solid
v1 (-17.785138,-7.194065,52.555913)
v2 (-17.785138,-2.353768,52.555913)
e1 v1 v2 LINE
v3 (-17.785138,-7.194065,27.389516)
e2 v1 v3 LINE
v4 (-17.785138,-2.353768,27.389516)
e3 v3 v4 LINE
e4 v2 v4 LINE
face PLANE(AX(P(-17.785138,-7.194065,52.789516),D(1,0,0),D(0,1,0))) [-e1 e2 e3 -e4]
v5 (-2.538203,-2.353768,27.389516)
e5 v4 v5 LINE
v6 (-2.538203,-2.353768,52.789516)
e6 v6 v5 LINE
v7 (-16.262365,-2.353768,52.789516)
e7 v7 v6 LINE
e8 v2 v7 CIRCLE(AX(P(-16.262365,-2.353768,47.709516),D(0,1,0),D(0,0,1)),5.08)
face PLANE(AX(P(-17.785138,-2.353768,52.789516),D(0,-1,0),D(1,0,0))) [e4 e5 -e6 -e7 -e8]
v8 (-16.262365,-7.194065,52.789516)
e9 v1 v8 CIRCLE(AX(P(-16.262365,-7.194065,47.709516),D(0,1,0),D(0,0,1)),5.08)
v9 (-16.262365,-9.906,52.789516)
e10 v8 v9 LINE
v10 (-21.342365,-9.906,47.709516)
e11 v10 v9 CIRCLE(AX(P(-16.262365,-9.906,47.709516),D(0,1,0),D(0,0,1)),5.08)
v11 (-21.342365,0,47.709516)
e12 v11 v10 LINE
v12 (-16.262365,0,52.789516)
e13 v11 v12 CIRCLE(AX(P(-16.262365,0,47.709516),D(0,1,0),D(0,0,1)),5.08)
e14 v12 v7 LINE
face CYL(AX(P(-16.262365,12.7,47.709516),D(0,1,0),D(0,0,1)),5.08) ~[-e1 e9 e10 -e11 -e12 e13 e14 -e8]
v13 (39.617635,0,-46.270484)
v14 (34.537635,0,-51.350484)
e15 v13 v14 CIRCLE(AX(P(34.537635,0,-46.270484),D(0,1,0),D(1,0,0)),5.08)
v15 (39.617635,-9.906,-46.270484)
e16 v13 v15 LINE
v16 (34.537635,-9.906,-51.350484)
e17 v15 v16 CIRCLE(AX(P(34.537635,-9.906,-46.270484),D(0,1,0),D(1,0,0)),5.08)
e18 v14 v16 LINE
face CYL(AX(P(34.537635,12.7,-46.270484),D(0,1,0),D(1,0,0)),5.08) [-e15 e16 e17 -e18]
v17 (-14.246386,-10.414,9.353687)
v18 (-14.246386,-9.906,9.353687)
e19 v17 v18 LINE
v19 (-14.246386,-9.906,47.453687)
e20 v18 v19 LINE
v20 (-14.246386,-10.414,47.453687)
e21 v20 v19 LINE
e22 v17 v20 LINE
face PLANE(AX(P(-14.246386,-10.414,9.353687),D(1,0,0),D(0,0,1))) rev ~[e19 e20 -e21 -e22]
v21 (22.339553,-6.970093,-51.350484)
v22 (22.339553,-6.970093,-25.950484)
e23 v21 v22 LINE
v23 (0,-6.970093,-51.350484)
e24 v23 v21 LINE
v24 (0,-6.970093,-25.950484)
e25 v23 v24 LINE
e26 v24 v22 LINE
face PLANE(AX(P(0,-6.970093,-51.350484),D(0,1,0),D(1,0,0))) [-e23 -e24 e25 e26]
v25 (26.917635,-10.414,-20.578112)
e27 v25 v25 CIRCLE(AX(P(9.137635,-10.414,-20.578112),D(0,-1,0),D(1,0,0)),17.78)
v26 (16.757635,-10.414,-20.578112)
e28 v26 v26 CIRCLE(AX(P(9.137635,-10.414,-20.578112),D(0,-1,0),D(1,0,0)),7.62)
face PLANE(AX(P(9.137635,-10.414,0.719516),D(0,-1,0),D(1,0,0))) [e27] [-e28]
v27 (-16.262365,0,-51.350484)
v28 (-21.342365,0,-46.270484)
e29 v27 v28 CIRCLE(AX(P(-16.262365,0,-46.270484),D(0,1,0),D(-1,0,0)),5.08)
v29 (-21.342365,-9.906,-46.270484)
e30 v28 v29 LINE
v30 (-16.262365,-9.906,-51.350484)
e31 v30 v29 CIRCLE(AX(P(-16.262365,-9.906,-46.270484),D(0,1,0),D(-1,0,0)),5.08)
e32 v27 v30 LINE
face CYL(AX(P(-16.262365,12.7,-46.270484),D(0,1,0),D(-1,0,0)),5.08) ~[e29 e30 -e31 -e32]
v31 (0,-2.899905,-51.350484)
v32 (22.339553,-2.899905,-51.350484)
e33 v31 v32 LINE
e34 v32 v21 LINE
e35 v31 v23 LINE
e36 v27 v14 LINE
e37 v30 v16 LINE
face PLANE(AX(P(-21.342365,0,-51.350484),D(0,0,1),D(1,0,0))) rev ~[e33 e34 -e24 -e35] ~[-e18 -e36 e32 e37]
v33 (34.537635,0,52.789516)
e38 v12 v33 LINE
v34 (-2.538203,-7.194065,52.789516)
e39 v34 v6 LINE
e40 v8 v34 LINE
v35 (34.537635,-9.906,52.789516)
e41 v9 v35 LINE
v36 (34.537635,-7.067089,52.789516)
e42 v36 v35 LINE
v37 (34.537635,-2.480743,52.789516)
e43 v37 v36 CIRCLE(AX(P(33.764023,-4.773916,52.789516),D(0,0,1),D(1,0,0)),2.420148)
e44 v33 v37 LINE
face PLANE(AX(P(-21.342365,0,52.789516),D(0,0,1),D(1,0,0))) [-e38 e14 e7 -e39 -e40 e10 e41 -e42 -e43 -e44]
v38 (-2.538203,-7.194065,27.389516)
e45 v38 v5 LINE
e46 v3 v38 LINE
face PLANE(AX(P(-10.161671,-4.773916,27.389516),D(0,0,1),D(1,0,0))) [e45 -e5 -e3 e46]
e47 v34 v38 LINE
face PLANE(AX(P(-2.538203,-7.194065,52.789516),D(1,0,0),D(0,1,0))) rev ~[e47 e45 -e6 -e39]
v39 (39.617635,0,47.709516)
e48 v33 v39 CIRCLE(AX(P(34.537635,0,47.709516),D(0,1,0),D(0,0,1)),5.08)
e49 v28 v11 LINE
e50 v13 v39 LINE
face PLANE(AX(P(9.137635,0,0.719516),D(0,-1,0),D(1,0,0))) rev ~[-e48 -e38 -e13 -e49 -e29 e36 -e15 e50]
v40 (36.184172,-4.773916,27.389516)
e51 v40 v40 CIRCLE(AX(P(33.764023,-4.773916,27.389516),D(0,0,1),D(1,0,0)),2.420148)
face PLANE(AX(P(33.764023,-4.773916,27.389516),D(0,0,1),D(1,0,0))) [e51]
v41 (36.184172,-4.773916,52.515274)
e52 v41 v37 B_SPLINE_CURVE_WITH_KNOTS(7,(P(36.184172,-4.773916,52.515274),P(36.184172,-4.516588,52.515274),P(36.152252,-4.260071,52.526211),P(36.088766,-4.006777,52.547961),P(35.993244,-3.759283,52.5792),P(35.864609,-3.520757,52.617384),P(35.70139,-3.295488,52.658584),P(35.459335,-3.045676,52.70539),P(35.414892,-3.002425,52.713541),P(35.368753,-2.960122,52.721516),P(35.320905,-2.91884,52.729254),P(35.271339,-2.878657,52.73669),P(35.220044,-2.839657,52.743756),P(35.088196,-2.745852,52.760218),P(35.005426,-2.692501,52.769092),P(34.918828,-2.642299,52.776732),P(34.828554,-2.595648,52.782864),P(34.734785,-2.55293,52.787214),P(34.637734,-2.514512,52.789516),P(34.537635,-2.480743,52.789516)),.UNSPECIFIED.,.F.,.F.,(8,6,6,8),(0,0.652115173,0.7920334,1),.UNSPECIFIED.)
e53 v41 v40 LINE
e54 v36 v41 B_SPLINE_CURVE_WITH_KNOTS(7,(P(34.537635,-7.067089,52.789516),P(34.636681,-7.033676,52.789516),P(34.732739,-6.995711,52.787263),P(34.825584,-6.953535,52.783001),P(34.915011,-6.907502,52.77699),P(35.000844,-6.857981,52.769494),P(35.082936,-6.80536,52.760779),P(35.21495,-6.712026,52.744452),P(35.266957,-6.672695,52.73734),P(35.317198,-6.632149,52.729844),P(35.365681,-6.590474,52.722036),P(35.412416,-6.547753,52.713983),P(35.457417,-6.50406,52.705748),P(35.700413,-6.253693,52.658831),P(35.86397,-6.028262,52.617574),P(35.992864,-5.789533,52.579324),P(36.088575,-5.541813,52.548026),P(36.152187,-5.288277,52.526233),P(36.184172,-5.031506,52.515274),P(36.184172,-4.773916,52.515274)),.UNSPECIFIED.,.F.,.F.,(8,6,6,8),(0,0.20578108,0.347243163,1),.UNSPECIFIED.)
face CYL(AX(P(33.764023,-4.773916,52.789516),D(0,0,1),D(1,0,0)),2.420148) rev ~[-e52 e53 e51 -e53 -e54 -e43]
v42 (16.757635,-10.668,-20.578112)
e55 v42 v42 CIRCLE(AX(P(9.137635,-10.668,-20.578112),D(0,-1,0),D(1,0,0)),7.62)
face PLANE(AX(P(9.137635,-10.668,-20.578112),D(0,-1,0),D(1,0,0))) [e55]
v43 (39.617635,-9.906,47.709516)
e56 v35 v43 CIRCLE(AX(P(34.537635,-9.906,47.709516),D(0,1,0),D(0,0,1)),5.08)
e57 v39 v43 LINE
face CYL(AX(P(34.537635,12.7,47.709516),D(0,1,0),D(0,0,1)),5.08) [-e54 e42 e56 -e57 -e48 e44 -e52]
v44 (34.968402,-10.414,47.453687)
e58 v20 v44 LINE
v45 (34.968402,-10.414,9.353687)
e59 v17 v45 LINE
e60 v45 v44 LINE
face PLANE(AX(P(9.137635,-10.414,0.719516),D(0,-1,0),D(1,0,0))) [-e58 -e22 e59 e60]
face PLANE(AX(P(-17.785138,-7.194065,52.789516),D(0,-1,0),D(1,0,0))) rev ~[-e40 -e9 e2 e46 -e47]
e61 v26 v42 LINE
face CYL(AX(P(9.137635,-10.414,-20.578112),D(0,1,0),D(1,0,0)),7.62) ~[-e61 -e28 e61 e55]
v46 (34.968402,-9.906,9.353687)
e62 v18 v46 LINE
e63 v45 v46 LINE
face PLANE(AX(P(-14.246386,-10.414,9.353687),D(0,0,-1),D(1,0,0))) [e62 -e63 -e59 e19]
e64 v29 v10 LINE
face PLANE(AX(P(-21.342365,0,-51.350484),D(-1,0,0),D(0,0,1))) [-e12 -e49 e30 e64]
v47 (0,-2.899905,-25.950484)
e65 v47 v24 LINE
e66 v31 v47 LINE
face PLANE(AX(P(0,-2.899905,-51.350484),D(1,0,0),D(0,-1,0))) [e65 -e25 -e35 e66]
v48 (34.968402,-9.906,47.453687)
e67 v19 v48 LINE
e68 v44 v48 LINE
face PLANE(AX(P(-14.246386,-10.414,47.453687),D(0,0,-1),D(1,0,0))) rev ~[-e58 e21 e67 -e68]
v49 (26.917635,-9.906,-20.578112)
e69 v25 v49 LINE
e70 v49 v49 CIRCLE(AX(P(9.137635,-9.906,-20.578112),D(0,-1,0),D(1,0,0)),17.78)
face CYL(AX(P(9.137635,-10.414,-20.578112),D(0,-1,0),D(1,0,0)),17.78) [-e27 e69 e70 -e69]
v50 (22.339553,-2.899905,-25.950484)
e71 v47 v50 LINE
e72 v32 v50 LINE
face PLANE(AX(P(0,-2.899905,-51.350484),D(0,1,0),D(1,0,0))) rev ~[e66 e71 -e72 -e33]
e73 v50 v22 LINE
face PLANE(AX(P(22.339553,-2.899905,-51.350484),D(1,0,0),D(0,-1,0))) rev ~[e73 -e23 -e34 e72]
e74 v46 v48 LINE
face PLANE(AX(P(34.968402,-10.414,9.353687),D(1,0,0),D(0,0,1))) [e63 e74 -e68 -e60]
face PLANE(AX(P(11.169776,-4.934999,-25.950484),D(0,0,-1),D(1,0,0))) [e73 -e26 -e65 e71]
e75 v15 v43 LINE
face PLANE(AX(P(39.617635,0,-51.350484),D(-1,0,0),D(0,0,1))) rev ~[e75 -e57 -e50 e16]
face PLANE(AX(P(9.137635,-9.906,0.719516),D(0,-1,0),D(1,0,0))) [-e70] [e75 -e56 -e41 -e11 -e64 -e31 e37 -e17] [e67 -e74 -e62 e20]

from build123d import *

# Parameters (mm, degrees)
F0_W        = 60.96
F0_H        = 104.14
F1_DEPTH    = 10.414
F2_W        = 60.96
F2_H        = 104.14
F2_R        = 17.78
F2_W_2      = 49.2147877812
F2_H_2      = 38.1
F3_DEPTH    = 0.508
F4_R        = 7.62
F5_DEPTH    = 0.254
F6_W        = 15.2469340246
F6_H        = 4.8402966931
F6_R        = 2.4201483466
F7_DEPTH    = 25.4
F8_T1_DEPTH = 35.306
F9_W        = 22.3395526409
F9_H        = 4.0701881517
F10_DEPTH   = 25.4


# Not quite as in the source:
# - a fillet or chamfer that OpenCascade refuses, or shapes differently, is made with other operations: its cross-section is extruded or revolved along the edge and cut away or added


with BuildPart() as f1:
    # F0 (on Front) → F1 (new body)
    with BuildSketch(Plane.XZ):
        with Locations((9.1376345801, 0.7195156068)):
            Rectangle(F0_W, F0_H)
    extrude(amount=F1_DEPTH)

    # F2 (on face) → F3 (cut)
    with BuildSketch(Plane.XZ.offset(10.414)):
        with Locations((9.1376345801, 0.7195156068)):
            Rectangle(F2_W, F2_H)
        with Locations((9.1376345801, -20.5781124532)):
            Circle(F2_R, mode=Mode.SUBTRACT)
        with Locations((10.3610083461, 28.4036870554)):
            Rectangle(F2_W_2, F2_H_2, mode=Mode.SUBTRACT)
    extrude(amount=-F3_DEPTH, mode=Mode.SUBTRACT)

    # F4 (on face) → F5 (join)
    with BuildSketch(Plane.XZ.offset(10.414)):
        with Locations((9.1376345801, -20.5781124532)):
            Circle(F4_R)
    extrude(amount=F5_DEPTH)

    # F6 (on face) → F7 (cut)
    with BuildSketch(Plane.XY.offset(52.7895156068)):
        with Locations((-10.1616705069, -4.773916211)):
            Rectangle(F6_W, F6_H)
        with Locations((33.7640233338, -4.773916211)):
            Circle(F6_R)
    extrude(amount=-F7_DEPTH, mode=Mode.SUBTRACT)

    # F8: fillet of radius 5.08 on 4 edges, made by hand

    # F8_s2 → F8_t1 (cut)
    with BuildSketch(Plane.XZ.offset(-12.7)):
        with BuildLine():
            ThreePointArc((39.6176345801, -46.2704843932), (38.1297370286, -49.8625868417), (34.5376345801, -51.3504843932))
            Line((34.5376345801, -51.3504843932), (39.6176345801, -51.3504843932))
            Line((39.6176345801, -51.3504843932), (39.6176345801, -46.2704843932))
        make_face()
        with BuildLine():
            ThreePointArc((-21.3423654199, -46.2704843932), (-19.8544678683, -49.8625868417), (-16.2623654199, -51.3504843932))
            Line((-16.2623654199, -51.3504843932), (-21.3423654199, -51.3504843932))
            Line((-21.3423654199, -51.3504843932), (-21.3423654199, -46.2704843932))
        make_face()
        with BuildLine():
            ThreePointArc((-16.2623654199, 52.7895156068), (-19.8544678683, 51.3016180552), (-21.3423654199, 47.7095156068))
            Line((-21.3423654199, 47.7095156068), (-21.3423654199, 52.7895156068))
            Line((-21.3423654199, 52.7895156068), (-16.2623654199, 52.7895156068))
        make_face()
        with BuildLine():
            ThreePointArc((34.5376345801, 52.7895156068), (38.1297370286, 51.3016180552), (39.6176345801, 47.7095156068))
            Line((39.6176345801, 47.7095156068), (39.6176345801, 52.7895156068))
            Line((39.6176345801, 52.7895156068), (34.5376345801, 52.7895156068))
        make_face()
    extrude(amount=F8_T1_DEPTH, mode=Mode.SUBTRACT)

    # F9 (on face) → F10 (cut)
    with BuildSketch(Plane(origin=(0, 0, -51.3504843932), x_dir=(1, 0, 0), z_dir=(0, 0, -1))):
        with Locations((11.1697763205, 4.9349990441)):
            Rectangle(F9_W, F9_H)
    extrude(amount=-F10_DEPTH, mode=Mode.SUBTRACT)


solid = f1.part
